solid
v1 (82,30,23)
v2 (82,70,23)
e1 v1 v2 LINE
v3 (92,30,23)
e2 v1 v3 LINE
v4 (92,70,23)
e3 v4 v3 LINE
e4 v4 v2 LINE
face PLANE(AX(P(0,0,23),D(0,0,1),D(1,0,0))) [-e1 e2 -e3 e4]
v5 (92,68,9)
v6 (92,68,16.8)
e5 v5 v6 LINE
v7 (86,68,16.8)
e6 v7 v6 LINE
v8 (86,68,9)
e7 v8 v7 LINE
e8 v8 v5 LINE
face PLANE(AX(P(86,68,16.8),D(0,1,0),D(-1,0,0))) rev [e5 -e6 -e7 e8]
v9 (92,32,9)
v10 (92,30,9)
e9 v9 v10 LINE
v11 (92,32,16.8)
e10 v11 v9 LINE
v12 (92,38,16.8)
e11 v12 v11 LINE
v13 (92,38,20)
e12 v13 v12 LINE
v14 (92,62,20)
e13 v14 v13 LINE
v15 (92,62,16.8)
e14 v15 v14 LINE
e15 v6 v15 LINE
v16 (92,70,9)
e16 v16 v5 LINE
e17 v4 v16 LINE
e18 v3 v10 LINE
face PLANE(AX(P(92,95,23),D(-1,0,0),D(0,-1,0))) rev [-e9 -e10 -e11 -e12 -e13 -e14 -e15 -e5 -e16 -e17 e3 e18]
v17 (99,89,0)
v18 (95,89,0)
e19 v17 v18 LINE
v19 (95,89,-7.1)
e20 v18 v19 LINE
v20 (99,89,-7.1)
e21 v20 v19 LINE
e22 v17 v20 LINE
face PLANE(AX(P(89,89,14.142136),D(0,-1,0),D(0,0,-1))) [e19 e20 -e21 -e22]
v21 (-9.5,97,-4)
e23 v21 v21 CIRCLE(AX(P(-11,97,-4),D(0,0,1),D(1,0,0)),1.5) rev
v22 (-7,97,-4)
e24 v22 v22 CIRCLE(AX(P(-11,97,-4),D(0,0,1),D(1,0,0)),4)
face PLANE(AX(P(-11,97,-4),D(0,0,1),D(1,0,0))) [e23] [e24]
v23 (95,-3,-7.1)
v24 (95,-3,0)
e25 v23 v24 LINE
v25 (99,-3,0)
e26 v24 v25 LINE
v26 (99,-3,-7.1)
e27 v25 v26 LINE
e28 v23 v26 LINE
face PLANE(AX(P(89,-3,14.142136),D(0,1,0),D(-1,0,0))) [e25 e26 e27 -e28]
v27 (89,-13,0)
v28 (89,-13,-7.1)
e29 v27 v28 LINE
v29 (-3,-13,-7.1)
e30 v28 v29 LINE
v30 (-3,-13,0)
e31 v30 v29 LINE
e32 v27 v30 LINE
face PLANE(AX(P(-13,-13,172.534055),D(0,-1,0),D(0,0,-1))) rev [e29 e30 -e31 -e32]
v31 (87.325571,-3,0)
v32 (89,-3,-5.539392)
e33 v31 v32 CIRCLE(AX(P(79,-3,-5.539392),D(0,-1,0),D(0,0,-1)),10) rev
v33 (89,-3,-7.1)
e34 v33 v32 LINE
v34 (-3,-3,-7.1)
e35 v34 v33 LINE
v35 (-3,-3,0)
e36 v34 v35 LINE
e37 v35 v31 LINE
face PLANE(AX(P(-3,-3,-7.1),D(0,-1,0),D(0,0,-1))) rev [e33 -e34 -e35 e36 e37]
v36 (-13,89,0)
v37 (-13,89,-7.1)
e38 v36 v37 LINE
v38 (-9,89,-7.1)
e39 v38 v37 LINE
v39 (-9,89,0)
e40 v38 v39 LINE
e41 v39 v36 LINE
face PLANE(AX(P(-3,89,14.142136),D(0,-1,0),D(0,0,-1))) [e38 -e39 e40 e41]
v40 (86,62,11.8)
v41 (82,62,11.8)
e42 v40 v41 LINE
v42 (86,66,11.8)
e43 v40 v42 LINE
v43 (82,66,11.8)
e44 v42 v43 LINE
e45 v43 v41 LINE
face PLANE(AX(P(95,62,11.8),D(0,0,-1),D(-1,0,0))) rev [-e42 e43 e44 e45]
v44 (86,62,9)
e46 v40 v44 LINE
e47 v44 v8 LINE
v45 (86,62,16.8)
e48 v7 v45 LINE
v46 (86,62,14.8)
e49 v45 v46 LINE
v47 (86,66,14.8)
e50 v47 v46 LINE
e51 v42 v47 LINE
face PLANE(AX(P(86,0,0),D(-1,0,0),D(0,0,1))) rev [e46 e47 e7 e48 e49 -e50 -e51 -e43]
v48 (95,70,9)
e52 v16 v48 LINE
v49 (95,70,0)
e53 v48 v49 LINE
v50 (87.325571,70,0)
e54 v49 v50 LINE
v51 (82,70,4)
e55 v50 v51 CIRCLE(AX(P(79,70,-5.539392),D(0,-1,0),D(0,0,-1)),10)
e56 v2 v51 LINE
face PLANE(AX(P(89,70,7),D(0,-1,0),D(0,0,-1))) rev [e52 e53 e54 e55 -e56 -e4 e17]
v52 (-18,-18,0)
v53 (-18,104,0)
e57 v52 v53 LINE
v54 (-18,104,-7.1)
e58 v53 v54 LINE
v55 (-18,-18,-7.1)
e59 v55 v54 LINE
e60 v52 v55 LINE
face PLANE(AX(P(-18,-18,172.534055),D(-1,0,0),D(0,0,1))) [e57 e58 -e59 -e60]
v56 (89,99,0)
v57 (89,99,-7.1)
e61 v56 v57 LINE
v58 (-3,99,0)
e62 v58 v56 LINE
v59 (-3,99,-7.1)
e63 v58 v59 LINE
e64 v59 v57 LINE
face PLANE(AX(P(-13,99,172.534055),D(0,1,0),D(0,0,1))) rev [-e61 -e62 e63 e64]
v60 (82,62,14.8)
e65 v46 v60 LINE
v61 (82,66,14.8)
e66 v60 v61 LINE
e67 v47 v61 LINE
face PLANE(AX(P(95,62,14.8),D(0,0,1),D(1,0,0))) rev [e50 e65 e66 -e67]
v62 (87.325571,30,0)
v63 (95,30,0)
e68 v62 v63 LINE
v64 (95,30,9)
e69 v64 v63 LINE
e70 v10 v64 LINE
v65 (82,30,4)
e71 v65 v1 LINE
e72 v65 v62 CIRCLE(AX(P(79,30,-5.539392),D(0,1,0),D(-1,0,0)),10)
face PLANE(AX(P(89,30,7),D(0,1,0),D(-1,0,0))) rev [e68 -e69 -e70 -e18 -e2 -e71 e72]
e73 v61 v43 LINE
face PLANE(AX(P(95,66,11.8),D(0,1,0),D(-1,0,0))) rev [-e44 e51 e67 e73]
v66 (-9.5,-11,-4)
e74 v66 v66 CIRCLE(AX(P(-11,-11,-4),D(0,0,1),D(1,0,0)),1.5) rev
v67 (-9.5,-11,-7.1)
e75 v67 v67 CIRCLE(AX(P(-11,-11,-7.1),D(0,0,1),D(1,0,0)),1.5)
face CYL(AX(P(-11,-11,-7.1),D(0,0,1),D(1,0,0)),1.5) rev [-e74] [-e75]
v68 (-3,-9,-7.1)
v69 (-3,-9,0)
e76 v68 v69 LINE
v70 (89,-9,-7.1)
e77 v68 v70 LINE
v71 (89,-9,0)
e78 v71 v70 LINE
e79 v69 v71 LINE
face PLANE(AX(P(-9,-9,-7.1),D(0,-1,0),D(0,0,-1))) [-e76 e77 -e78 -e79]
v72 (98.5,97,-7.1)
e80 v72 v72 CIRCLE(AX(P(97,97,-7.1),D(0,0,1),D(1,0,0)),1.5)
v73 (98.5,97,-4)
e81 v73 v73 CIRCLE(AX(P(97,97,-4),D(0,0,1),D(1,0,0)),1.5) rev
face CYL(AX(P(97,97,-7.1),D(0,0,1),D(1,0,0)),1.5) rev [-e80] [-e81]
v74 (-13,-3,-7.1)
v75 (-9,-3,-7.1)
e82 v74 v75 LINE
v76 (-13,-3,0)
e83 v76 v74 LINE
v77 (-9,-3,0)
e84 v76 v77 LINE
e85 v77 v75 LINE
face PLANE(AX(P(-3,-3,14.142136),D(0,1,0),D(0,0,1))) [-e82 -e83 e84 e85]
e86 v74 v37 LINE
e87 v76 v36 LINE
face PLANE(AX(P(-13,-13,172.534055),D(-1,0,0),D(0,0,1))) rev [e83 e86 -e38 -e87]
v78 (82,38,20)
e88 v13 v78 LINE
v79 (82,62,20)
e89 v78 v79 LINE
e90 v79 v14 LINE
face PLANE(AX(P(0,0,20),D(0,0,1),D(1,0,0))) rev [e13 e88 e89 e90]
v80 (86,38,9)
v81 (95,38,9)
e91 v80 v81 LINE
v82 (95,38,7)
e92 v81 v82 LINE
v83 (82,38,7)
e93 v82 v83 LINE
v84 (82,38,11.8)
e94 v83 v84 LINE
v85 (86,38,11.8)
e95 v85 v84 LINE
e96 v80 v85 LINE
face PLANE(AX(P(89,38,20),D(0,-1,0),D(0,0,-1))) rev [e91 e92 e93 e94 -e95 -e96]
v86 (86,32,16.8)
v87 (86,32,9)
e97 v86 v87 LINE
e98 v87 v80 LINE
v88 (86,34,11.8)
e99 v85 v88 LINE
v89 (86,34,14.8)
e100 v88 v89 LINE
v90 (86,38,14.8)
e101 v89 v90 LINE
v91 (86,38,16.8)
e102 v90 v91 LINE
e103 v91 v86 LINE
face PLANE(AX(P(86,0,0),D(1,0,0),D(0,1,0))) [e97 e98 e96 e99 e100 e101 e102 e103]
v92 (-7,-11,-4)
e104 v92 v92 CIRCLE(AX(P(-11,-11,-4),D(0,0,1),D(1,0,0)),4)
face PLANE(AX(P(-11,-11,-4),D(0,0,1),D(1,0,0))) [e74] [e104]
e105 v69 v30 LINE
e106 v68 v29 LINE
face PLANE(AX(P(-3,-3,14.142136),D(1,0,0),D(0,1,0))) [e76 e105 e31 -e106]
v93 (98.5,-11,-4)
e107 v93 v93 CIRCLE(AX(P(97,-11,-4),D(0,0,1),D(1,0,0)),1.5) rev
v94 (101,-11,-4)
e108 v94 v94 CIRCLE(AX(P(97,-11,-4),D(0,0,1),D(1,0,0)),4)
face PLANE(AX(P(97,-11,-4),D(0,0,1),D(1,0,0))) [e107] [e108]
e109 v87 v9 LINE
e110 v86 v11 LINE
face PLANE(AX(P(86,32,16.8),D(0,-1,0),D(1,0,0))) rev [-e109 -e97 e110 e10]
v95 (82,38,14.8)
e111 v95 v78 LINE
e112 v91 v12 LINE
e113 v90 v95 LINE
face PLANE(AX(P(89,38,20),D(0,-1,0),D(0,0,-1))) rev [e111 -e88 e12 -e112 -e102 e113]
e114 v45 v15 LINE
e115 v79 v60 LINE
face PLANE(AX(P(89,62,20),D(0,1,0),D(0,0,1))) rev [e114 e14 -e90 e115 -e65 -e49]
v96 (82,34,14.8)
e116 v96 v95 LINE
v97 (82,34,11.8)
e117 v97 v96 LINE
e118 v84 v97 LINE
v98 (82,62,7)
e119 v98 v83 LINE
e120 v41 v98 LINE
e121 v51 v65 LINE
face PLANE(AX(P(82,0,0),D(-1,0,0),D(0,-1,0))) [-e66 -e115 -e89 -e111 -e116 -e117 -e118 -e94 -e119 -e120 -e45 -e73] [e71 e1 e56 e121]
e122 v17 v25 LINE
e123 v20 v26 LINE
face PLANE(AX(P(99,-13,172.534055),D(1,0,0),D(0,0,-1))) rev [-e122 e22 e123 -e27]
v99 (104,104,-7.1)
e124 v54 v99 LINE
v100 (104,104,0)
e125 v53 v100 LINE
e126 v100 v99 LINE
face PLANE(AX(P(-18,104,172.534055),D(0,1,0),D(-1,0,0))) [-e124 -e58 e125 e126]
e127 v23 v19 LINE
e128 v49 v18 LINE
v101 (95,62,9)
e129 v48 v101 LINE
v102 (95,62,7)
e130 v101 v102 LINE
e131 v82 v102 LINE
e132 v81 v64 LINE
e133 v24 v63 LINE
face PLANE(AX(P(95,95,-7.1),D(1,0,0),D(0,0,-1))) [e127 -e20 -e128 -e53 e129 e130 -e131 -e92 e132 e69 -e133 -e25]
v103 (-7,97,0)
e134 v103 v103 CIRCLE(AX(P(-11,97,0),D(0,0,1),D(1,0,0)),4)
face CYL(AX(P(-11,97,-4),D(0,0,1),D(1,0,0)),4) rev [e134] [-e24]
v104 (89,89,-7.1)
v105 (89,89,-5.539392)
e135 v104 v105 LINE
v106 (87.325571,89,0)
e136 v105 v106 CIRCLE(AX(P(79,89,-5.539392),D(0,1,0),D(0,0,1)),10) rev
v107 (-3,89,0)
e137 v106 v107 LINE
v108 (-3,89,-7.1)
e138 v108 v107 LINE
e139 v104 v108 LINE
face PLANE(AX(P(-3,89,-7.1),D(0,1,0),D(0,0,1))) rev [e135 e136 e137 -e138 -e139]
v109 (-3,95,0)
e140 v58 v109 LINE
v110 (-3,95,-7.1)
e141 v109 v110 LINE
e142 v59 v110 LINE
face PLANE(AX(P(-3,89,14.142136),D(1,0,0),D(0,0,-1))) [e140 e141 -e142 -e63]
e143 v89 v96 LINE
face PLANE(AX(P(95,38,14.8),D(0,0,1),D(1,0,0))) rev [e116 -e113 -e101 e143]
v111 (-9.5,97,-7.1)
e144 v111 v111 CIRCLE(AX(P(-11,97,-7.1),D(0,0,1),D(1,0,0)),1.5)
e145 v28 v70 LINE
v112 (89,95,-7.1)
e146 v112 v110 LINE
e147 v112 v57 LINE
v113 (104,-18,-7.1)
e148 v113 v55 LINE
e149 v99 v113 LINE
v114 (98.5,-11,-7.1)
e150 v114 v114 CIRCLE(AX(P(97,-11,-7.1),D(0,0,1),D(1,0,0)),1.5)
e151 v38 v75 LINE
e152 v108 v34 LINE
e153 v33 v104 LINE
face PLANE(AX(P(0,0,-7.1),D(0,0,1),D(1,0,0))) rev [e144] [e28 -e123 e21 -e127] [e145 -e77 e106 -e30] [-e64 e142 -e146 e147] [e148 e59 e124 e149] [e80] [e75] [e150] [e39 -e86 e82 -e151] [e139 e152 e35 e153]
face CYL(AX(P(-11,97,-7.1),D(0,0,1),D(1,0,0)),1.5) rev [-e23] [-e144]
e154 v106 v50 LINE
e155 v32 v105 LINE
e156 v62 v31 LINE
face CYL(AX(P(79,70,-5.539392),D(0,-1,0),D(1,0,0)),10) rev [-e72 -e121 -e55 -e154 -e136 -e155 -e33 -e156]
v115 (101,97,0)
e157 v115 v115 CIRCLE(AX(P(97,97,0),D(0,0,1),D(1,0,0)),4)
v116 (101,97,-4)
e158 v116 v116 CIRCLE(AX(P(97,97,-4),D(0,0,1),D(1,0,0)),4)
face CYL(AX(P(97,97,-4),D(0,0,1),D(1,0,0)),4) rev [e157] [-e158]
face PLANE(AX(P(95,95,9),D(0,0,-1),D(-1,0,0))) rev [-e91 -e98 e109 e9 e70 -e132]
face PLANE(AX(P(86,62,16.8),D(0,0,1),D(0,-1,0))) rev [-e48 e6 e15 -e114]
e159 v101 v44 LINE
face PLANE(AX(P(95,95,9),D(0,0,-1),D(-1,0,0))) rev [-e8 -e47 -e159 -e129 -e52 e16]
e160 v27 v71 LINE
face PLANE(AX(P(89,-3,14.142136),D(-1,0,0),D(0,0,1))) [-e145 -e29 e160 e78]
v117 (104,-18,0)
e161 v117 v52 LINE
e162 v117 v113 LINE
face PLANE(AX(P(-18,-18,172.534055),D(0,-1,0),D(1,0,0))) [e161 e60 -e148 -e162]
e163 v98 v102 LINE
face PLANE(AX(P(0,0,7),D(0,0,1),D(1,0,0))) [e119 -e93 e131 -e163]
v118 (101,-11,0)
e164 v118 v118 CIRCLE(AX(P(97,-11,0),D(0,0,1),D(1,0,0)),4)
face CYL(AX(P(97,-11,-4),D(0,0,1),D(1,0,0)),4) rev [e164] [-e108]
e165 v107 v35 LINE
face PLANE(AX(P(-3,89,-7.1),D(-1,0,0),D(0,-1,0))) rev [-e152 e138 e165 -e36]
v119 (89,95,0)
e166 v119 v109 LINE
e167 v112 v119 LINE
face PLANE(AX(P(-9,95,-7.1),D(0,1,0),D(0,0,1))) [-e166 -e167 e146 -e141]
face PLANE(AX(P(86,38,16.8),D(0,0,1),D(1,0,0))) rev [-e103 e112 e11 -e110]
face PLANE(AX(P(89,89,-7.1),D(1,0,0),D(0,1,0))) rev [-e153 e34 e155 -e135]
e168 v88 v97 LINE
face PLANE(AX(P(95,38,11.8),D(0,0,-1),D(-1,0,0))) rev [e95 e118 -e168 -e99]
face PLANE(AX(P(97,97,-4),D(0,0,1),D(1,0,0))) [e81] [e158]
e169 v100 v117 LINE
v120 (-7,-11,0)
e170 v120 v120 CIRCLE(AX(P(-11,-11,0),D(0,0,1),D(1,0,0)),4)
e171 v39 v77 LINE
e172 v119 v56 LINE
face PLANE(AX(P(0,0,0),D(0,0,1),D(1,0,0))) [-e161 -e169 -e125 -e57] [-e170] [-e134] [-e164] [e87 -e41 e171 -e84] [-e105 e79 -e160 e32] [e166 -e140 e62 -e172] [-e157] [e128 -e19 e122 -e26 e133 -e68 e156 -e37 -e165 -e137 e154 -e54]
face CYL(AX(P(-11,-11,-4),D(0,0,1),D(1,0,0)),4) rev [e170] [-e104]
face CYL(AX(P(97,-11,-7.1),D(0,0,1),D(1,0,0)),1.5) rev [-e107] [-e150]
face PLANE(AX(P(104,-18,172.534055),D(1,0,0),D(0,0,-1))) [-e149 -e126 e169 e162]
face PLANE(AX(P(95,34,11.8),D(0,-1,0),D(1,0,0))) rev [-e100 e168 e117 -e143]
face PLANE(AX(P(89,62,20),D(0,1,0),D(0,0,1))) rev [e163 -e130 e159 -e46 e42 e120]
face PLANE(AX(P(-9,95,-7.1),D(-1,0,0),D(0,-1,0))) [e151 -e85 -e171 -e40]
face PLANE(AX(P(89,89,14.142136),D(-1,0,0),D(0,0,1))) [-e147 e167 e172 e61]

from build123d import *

# Parameters (mm, degrees)
SKETCH_1_W          = 104
SKETCH_1_H          = 104
SKETCH_1_W_2        = 92
SKETCH_1_H_2        = 92
EXTRUDE_1_DEPTH     = 7.1
SKETCH_2_W          = 6
SKETCH_2_H          = 40
EXTRUDE_2_DEPTH     = 7
SKETCH_3_W          = 6
SKETCH_3_H          = 8
EXTRUDE_3_DEPTH     = 13
SKETCH_4_W          = 6
SKETCH_4_H          = 40
EXTRUDE_4_DEPTH     = 3
SKETCH_5_W          = 3
SKETCH_5_H          = 14
CUT_EXTRUDE_1_DEPTH = 118.383985279
SKETCH_6_W          = 19
SKETCH_6_H          = 40
SKETCH_6_W_2        = 13
SKETCH_6_H_2        = 24
EXTRUDE_5_DEPTH     = 7
SKETCH_7_W          = 3
SKETCH_7_H          = 4
CUT_EXTRUDE_3_DEPTH = 134.547744271
SKETCH_8_W          = 7.8
SKETCH_8_H          = 6
CUT_EXTRUDE_4_DEPTH = 6
FILLET_START        = 30
FILLET_1_DEPTH      = 40
FILLET_START_2      = -4
FILLET_1_2_DEPTH    = 94
SKETCH_9_W          = 10
SKETCH_9_H          = 10
EXTRUDE_6_DEPTH     = 7.1
SKETCH_10_W         = 122
SKETCH_10_H         = 122
SKETCH_10_W_2       = 112
SKETCH_10_H_2       = 112
EXTRUDE_7_DEPTH     = 7.1
SKETCH_11_R         = 1.5
CUT_EXTRUDE_5_DEPTH = 149.865711297
SKETCH_12_R         = 4
CUT_EXTRUDE_6_DEPTH = 4


with BuildPart() as part:
    # 草图1 → 凸台-拉伸1 (new body)
    with BuildSketch(Plane.XY):
        with Locations((43, 43)):
            Rectangle(SKETCH_1_W, SKETCH_1_H)
        with Locations((43, 43)):
            Rectangle(SKETCH_1_W_2, SKETCH_1_H_2, mode=Mode.SUBTRACT)
    extrude(amount=-EXTRUDE_1_DEPTH)

    # 草图2 → 凸台-拉伸2 (add)
    with BuildSketch(Plane.XY):
        with Locations((92, 50)):
            Rectangle(SKETCH_2_W, SKETCH_2_H)
    extrude(amount=EXTRUDE_2_DEPTH)

    # 草图3 → 凸台-拉伸3 (add)
    with BuildSketch(Plane.XY.offset(7)):
        with Locations((92, 66)):
            Rectangle(SKETCH_3_W, SKETCH_3_H)
        with Locations((92, 34)):
            Rectangle(SKETCH_3_W, SKETCH_3_H)
    extrude(amount=EXTRUDE_3_DEPTH)

    # 草图4 → 凸台-拉伸4 (add)
    with BuildSketch(Plane.XY.offset(20)):
        with Locations((92, 50)):
            Rectangle(SKETCH_4_W, SKETCH_4_H)
    extrude(amount=EXTRUDE_4_DEPTH)

    # 草图5 → 切除-拉伸1 (cut, through all)
    with BuildSketch(Plane.XZ.offset(-30)):
        with Locations((93.5, 16)):
            Rectangle(SKETCH_5_W, SKETCH_5_H)
    extrude(amount=-CUT_EXTRUDE_1_DEPTH, mode=Mode.SUBTRACT)

    # 草图6 → 凸台-拉伸5 (add)
    with BuildSketch(Plane.ZY.offset(-89)):
        with Locations((13.5, 50)):
            Rectangle(SKETCH_6_W, SKETCH_6_H)
        with Locations((13.5, 50)):
            Rectangle(SKETCH_6_W_2, SKETCH_6_H_2, mode=Mode.SUBTRACT)
    extrude(amount=EXTRUDE_5_DEPTH)

    # 草图7 → 切除-拉伸3 (cut, through all)
    with BuildSketch(Plane.ZY.offset(-82)):
        with Locations((13.3, 64)):
            Rectangle(SKETCH_7_W, SKETCH_7_H)
        with Locations((13.3, 36)):
            Rectangle(SKETCH_7_W, SKETCH_7_H)
    extrude(amount=-CUT_EXTRUDE_3_DEPTH, mode=Mode.SUBTRACT)

    # 草图8 → 切除-拉伸4 (cut)
    with BuildSketch(Plane(origin=(92, 0, 0), x_dir=(0, 0, -1), z_dir=(1, 0, 0))):
        with Locations((-12.9, 65)):
            Rectangle(SKETCH_8_W, SKETCH_8_H)
        with Locations((-12.9, 35)):
            Rectangle(SKETCH_8_W, SKETCH_8_H)
    extrude(amount=-CUT_EXTRUDE_4_DEPTH, mode=Mode.SUBTRACT)

    # 圆角1: read off the stored shape, not the designer's step
    # 圆角1 outline → 圆角1 (add)
    with BuildSketch(Plane(origin=(0, 0, 0), x_dir=(1, 0, 0), z_dir=(0, 1, 0)).offset(FILLET_START)):
        with BuildLine():
            ThreePointArc((89, 5.539392014), (87.062257748, -0.376687769), (82, -4))
            Line((82, -4), (89, -4))
            Line((89, -4), (89, 5.539392014))
        make_face()
    extrude(amount=FILLET_1_DEPTH)

    # Fillet 1 2 outline → Fillet 1 2 (add)
    with BuildSketch(Plane(origin=(0, 0, 0), x_dir=(1, 0, 0), z_dir=(0, 1, 0)).offset(FILLET_START_2)):
        with BuildLine():
            Line((89, 0), (89, 5.539392014))
            ThreePointArc((89, 5.539392014), (88.572244047, 2.645926288), (87.325571218, 0))
            Line((87.325571218, 0), (89, 0))
        make_face()
    extrude(amount=FILLET_1_2_DEPTH)

    # 草图9 → 凸台-拉伸6 (add)
    with BuildSketch(Plane(origin=(0, 0, -7.1), x_dir=(-1, 0, 0), z_dir=(0, 0, -1))):
        with Locations((8, -8)):
            Rectangle(SKETCH_9_W, SKETCH_9_H)
        with Locations((-94, -8)):
            Rectangle(SKETCH_9_W, SKETCH_9_H)
        with Locations((8, 94)):
            Rectangle(SKETCH_9_W, SKETCH_9_H)
        with Locations((-94, 94)):
            Rectangle(SKETCH_9_W, SKETCH_9_H)
    extrude(amount=-EXTRUDE_6_DEPTH)

    # 草图10 → 凸台-拉伸7 (add)
    with BuildSketch(Plane(origin=(0, 0, -7.1), x_dir=(-1, 0, 0), z_dir=(0, 0, -1))):
        with Locations((-43, 43)):
            Rectangle(SKETCH_10_W, SKETCH_10_H)
        with Locations((-43, 43)):
            Rectangle(SKETCH_10_W_2, SKETCH_10_H_2, mode=Mode.SUBTRACT)
    extrude(amount=-EXTRUDE_7_DEPTH)

    # 草图11 → 切除-拉伸5 (cut, through all)
    with BuildSketch(Plane.XY):
        with Locations((-11, 97)):
            Circle(SKETCH_11_R)
        with Locations((-11, -11)):
            Circle(SKETCH_11_R)
        with Locations((97, 97)):
            Circle(SKETCH_11_R)
        with Locations((97, -11)):
            Circle(SKETCH_11_R)
    extrude(amount=-CUT_EXTRUDE_5_DEPTH, mode=Mode.SUBTRACT)

    # 草图12 → 切除-拉伸6 (cut)
    with BuildSketch(Plane.XY):
        with Locations((-11, 97)):
            Circle(SKETCH_12_R)
        with Locations((97, 97)):
            Circle(SKETCH_12_R)
        with Locations((-11, -11)):
            Circle(SKETCH_12_R)
        with Locations((97, -11)):
            Circle(SKETCH_12_R)
    extrude(amount=-CUT_EXTRUDE_6_DEPTH, mode=Mode.SUBTRACT)


solid = part.part
